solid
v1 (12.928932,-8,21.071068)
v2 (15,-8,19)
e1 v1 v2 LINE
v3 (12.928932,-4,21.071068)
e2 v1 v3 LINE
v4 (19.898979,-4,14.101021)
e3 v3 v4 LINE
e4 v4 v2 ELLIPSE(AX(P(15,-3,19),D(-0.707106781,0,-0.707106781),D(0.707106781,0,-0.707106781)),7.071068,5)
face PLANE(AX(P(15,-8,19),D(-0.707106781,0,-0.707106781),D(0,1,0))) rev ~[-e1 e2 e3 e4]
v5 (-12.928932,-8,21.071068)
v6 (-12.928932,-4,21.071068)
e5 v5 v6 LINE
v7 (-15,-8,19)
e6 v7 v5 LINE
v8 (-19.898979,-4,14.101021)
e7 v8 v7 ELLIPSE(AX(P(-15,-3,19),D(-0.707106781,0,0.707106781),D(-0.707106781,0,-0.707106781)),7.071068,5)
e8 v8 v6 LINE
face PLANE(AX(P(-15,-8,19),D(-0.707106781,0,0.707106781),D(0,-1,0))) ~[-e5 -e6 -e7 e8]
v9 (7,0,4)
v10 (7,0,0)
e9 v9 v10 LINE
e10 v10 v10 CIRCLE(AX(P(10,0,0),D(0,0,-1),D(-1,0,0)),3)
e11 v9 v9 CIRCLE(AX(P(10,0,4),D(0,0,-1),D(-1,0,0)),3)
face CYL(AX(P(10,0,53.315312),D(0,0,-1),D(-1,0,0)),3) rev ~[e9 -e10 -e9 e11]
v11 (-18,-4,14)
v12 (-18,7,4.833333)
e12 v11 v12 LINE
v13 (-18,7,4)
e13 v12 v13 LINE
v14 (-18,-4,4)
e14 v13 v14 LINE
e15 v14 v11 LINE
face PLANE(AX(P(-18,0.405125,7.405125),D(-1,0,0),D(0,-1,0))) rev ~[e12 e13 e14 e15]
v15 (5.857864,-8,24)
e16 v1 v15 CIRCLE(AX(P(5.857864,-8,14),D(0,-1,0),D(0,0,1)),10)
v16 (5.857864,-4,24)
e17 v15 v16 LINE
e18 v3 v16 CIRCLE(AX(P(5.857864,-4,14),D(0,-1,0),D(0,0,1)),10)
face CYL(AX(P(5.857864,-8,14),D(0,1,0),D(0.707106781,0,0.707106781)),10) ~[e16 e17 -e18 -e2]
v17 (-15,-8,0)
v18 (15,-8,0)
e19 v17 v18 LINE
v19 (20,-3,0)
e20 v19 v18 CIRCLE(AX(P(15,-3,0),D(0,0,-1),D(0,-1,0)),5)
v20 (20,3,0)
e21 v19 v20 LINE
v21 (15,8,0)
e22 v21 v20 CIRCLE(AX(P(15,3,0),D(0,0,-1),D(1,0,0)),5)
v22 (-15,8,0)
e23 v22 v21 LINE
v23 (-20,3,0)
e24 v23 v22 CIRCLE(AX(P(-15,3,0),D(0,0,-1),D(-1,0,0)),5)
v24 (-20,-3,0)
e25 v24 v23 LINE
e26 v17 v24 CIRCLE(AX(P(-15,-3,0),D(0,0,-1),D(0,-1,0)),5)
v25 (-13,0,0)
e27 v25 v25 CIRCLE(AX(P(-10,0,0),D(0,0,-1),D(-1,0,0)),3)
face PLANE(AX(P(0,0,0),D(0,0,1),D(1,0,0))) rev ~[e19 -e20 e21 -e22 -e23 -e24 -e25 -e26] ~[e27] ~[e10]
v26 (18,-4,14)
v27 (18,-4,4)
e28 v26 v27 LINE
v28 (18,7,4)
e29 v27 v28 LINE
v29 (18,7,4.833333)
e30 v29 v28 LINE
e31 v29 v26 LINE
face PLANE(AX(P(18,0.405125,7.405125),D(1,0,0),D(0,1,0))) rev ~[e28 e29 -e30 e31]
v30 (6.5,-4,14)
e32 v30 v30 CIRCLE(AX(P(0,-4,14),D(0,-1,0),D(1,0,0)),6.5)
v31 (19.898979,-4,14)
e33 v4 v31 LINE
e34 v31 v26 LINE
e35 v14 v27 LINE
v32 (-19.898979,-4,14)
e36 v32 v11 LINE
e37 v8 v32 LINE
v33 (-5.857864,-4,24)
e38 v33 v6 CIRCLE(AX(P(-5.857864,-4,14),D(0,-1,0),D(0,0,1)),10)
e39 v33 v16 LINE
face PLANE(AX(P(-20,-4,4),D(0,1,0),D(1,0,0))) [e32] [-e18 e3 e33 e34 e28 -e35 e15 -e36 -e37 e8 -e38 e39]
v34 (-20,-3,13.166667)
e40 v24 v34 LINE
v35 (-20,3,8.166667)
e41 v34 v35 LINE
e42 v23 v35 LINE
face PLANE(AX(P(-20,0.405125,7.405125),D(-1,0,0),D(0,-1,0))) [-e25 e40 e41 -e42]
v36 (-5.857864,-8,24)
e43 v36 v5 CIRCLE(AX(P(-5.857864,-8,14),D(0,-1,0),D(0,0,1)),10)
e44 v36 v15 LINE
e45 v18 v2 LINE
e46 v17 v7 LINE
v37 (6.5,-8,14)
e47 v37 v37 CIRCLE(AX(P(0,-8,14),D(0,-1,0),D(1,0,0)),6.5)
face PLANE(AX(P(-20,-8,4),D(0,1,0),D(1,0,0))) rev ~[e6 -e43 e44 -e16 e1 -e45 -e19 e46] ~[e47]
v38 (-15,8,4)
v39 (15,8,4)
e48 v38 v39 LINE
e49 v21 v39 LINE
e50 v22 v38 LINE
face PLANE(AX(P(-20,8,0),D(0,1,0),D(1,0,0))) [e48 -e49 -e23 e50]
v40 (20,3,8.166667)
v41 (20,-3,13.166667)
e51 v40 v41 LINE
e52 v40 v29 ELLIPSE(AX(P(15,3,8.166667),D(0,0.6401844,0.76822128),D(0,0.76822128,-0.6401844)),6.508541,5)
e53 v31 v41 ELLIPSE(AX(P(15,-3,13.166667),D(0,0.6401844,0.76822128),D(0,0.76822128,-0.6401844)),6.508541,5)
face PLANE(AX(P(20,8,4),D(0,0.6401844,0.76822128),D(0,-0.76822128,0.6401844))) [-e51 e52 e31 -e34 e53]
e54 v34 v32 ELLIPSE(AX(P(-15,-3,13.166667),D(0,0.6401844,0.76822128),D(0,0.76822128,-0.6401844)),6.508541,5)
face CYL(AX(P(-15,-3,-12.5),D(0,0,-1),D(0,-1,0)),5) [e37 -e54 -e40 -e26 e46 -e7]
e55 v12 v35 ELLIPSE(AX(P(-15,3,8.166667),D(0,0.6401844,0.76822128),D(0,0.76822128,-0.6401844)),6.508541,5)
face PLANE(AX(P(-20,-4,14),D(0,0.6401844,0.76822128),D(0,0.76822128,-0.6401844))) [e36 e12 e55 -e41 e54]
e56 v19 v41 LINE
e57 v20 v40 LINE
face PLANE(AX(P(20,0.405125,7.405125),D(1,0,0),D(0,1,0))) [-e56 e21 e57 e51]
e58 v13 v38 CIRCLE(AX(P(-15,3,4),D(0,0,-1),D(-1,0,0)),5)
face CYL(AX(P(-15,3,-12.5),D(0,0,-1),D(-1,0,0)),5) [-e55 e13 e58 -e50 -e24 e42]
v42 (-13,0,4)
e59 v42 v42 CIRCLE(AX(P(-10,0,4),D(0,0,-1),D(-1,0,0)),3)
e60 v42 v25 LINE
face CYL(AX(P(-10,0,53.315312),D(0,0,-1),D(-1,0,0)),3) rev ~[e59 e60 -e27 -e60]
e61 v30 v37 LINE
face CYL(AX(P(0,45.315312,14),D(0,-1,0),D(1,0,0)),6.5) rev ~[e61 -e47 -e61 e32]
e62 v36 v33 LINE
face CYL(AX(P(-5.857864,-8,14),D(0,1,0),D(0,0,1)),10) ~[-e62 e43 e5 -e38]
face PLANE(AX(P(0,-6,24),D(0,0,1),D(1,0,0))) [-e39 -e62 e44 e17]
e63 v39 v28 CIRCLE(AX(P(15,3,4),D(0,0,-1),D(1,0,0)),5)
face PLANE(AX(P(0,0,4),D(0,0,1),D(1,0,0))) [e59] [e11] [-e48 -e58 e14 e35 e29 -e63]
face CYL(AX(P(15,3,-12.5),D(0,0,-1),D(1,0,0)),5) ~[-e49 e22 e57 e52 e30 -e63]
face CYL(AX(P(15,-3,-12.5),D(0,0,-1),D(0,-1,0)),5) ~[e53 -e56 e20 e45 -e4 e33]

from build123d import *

# Parameters (mm, degrees)
F0_W         = 40
F0_H         = 16
F1_DEPTH     = 4
F2_W         = 40
F2_H         = 4
F3_DEPTH     = 20
F4_D         = 6
F12_D        = 13
F6_SIZE      = 10
F8_DEPTH     = 2
F9_DEPTH     = 2
F10_T1_DEPTH = 29
F10_T3_DEPTH = 39
F11_R        = 10


# Not quite as in the source:
# - a fillet or chamfer that OpenCascade refuses, or shapes differently, is made with other operations: its cross-section is extruded or revolved along the edge and cut away or added


with BuildPart() as f1:
    # F0 (on Top) → F1 (new body)
    with BuildSketch(Plane.XY):
        Rectangle(F0_W, F0_H)
    extrude(amount=F1_DEPTH)

    # F2 (on face) → F3 (join)
    with BuildSketch(Plane.XY.offset(4)):
        with Locations((0, -6)):
            Rectangle(F2_W, F2_H)
    extrude(amount=F3_DEPTH)

    # F4 (through all)
    with Locations(Plane.XY.offset(4)):
        with Locations((-10, 0), (10, 0)):
            Hole(F4_D / 2)

    # F12 (through all)
    with Locations(Plane(origin=(0, -4, 0), x_dir=(-1, 0, 0), z_dir=(0, 1, 0))):
        with Locations((0, 14)):
            Hole(F12_D / 2)

    # F6
    f6_edges = [f1.edges().sort_by_distance(p)[0] for p in [
        (-20, -6, 24),
        (20, -6, 24),
    ]]
    chamfer(f6_edges, length=F6_SIZE)

    # F7 (on face) → F8 (join)
    with BuildSketch(Plane(origin=(-20, 0, 0), x_dir=(0, -1, 0), z_dir=(-1, 0, 0))):
        Polygon((4, 14), (-8, 4), (4, 4), align=None)
    extrude(amount=-F8_DEPTH)

    # F13 (on face) → F9 (join)
    with BuildSketch(Plane.YZ.offset(20)):
        Polygon((-4, 4), (8, 4), (-4, 14), align=None)
    extrude(amount=-F9_DEPTH)

    # F10: fillet of radius 5 on 4 edges, made by hand

    # F10_s2 → F10_t1 (cut)
    with BuildSketch(Plane.XY.offset(-12.5)):
        with BuildLine():
            ThreePointArc((20, 3), (18.5355339059, 6.5355339059), (15, 8))
            Line((15, 8), (20, 8))
            Line((20, 8), (20, 3))
        make_face()
        with BuildLine():
            ThreePointArc((-20, 3), (-18.5355339059, 6.5355339059), (-15, 8))
            Line((-15, 8), (-20, 8))
            Line((-20, 8), (-20, 3))
        make_face()
    extrude(amount=F10_T1_DEPTH, mode=Mode.SUBTRACT)

    # F10_s4 → F10_t3 (cut)
    with BuildSketch(Plane.XY.offset(-12.5)):
        with BuildLine():
            ThreePointArc((-15, -8), (-18.5355339059, -6.5355339059), (-20, -3))
            Line((-20, -3), (-20, -8))
            Line((-20, -8), (-15, -8))
        make_face()
        with BuildLine():
            ThreePointArc((15, -8), (18.5355339059, -6.5355339059), (20, -3))
            Line((20, -3), (20, -8))
            Line((20, -8), (15, -8))
        make_face()
    extrude(amount=F10_T3_DEPTH, mode=Mode.SUBTRACT)

    # F11
    f11_edges = [f1.edges().sort_by_distance(p)[0] for p in [
        (10, -6, 24),
        (-10, -6, 24),
    ]]
    fillet(f11_edges, radius=F11_R)


solid = f1.part
